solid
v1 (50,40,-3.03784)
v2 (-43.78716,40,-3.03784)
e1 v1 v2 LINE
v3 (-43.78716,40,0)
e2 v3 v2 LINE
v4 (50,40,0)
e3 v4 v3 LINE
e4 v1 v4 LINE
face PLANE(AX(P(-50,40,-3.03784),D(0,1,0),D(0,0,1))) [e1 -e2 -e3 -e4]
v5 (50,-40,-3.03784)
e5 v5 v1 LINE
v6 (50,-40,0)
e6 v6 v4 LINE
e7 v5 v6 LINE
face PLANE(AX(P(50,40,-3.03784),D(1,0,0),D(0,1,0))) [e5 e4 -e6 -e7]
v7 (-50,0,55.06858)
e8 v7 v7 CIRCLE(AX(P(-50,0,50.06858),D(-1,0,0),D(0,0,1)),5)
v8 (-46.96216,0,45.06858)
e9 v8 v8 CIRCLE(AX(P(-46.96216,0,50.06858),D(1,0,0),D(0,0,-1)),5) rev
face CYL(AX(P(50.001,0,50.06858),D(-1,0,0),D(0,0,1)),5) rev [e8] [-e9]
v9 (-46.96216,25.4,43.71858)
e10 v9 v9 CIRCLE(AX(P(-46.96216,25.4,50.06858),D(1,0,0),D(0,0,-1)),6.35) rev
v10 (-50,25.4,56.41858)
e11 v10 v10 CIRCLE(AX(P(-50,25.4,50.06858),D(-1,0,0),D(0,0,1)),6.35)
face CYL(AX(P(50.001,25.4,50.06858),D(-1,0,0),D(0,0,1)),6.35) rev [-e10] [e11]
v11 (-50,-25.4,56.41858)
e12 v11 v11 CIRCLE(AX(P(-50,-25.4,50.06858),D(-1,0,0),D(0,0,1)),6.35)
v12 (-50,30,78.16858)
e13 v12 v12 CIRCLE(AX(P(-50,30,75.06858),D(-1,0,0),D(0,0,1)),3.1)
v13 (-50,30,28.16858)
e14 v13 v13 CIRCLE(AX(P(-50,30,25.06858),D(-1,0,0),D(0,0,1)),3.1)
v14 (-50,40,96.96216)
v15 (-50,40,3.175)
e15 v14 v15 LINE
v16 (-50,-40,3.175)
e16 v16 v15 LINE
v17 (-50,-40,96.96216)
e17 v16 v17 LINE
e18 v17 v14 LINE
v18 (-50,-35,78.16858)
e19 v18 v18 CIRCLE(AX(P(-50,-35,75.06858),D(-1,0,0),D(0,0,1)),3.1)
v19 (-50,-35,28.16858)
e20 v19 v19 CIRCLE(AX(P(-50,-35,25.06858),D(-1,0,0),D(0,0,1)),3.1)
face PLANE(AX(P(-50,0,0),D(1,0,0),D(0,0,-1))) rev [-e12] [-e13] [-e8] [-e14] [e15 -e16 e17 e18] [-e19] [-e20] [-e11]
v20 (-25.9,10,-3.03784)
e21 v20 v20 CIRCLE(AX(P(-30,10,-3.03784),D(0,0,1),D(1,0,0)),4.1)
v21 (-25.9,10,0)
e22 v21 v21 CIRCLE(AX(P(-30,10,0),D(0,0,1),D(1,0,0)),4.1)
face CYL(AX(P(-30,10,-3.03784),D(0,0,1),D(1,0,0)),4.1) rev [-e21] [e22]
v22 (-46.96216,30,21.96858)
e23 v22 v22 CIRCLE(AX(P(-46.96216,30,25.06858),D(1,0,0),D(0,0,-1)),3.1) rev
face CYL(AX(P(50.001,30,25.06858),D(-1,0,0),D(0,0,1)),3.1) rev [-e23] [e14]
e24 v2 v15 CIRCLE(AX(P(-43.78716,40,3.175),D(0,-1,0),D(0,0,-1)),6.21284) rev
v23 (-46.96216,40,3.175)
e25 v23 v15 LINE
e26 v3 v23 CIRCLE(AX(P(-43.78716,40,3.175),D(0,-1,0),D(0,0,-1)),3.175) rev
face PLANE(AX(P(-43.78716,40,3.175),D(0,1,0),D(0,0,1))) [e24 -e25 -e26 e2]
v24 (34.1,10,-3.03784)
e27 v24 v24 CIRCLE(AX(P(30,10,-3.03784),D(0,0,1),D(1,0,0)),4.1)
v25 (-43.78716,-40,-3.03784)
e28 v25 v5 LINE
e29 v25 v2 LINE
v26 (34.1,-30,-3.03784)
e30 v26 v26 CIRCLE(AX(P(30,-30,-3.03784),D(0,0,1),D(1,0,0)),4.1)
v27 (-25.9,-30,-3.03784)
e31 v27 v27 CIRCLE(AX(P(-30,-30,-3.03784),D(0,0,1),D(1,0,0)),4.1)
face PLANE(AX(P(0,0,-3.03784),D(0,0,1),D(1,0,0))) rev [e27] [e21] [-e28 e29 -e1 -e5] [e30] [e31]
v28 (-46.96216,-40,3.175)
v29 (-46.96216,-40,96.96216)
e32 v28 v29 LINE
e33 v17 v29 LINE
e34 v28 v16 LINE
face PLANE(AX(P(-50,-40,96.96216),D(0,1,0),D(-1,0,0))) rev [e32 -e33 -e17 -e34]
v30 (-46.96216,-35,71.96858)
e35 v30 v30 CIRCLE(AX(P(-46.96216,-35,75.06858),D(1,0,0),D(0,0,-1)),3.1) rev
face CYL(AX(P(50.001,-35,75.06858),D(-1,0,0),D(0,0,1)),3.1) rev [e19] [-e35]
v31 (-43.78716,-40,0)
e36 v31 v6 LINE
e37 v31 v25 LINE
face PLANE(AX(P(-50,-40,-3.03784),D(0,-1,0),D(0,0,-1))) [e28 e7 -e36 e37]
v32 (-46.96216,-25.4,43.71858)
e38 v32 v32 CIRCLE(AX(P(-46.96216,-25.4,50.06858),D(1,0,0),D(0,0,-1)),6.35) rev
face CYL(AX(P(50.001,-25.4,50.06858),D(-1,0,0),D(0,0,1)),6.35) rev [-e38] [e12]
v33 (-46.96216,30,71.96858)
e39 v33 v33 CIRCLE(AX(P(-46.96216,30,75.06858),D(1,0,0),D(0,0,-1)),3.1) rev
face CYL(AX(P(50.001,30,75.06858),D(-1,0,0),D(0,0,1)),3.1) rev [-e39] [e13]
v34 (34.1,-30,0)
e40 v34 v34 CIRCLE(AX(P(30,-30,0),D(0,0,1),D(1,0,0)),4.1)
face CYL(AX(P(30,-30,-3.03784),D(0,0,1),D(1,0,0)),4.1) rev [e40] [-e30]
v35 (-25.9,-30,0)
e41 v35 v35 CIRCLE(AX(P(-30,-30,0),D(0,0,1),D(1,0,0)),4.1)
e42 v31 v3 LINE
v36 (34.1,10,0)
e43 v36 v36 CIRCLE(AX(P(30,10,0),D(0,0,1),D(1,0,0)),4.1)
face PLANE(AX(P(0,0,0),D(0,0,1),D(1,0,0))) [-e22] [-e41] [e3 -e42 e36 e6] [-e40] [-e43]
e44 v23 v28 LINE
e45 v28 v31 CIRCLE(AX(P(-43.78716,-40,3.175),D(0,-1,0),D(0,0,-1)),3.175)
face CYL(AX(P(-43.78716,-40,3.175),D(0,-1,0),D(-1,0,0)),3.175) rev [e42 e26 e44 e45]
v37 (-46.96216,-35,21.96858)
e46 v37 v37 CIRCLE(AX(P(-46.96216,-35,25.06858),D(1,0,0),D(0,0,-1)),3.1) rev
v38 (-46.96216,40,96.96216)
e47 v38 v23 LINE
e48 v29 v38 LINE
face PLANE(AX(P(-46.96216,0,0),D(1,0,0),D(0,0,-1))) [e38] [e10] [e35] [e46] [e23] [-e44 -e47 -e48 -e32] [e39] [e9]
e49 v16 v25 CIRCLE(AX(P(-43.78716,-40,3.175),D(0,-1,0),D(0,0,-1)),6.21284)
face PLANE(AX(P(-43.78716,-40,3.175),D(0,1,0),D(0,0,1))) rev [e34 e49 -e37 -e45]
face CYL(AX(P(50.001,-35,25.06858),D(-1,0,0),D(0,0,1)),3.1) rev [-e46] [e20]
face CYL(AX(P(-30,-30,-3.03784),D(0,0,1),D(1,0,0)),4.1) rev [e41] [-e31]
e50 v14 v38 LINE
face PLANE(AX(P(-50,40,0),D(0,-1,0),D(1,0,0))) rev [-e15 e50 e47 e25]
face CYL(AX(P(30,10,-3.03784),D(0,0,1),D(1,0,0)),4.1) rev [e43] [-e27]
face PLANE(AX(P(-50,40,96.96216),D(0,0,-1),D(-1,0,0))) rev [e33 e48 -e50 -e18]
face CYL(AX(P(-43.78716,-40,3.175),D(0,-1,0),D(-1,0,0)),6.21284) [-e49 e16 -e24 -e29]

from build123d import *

# Parameters (mm, degrees)
CROQUIS1_W                       = 100
CROQUIS1_H                       = 80
CROQUIS1_R                       = 4.1
BRIDA_BASE1_DEPTH                = 3.03784
BRIDA_DE_ARISTA1_STRIP_W         = 18.50136
BRIDA_DE_ARISTA1_STRIP_H         = 3.03784
BRIDA_DE_ARISTA1_STRIP_CUT_DEPTH = 80
BRIDA_DE_ARISTA1_DEPTH           = 80
CORTAR_EXTRUIR1_REACH            = 146.919
CROQUIS9_R                       = 6.35
CROQUIS9_R_2                     = 3.1
CROQUIS9_R_3                     = 5


# Sheet-metal steps are written as plain solids
with BuildPart() as part:
    # Croquis1 → Brida base1 (new body)
    with BuildSketch(Plane.XY):
        Rectangle(CROQUIS1_W, CROQUIS1_H)
        with Locations((-30, 10)):
            Circle(CROQUIS1_R, mode=Mode.SUBTRACT)
        with Locations((30, 10)):
            Circle(CROQUIS1_R, mode=Mode.SUBTRACT)
        with Locations((-30, -30)):
            Circle(CROQUIS1_R, mode=Mode.SUBTRACT)
        with Locations((30, -30)):
            Circle(CROQUIS1_R, mode=Mode.SUBTRACT)
    extrude(amount=-BRIDA_BASE1_DEPTH)

    # Brida de arista1 strip (across the edge) → Brida de arista1 strip cut (cut)
    with BuildSketch(Plane(origin=(-50, 40, 0), x_dir=(1, 0, 0), z_dir=(0, -1, 0))):
        with Locations((-3.03784, -1.51892)):
            Rectangle(BRIDA_DE_ARISTA1_STRIP_W, BRIDA_DE_ARISTA1_STRIP_H)
    extrude(amount=BRIDA_DE_ARISTA1_STRIP_CUT_DEPTH, mode=Mode.SUBTRACT)

    # Brida de arista1 section (across the edge) → Brida de arista1 (add)
    with BuildSketch(Plane(origin=(-50, 40, 0), x_dir=(1, 0, 0), z_dir=(0, -1, 0))):
        with BuildLine():
            Line((0, 3.175), (0, 96.96216))
            Line((0, 96.96216), (3.03784, 96.96216))
            Line((3.03784, 96.96216), (3.03784, 3.175))
            ThreePointArc((3.03784, 3.175), (3.96777597, 0.92993597), (6.21284, 0))
            Line((6.21284, 0), (6.21284, -3.03784))
            ThreePointArc((6.21284, -3.03784), (1.819698706, -1.218141294), (0, 3.175))
        make_face()
    extrude(amount=BRIDA_DE_ARISTA1_DEPTH)

    # Croquis9 → Cortar-Extruir1 (cut, up to next)
    with BuildSketch(Plane.ZY.offset(50), mode=Mode.PRIVATE) as cortar_extruir1_sk1:
        with Locations((50.06858, 25.4)):
            Circle(CROQUIS9_R)
    cortar_extruir1_tool1 = extrude(cortar_extruir1_sk1.sketch, amount=-CORTAR_EXTRUIR1_REACH, mode=Mode.PRIVATE) & part.part
    # Croquis9 → Cortar-Extruir1 (cut, up to next)
    with BuildSketch(Plane.ZY.offset(50), mode=Mode.PRIVATE) as cortar_extruir1_sk2:
        with Locations((50.06858, -25.4)):
            Circle(CROQUIS9_R)
    cortar_extruir1_tool2 = extrude(cortar_extruir1_sk2.sketch, amount=-CORTAR_EXTRUIR1_REACH, mode=Mode.PRIVATE) & part.part
    # Croquis9 → Cortar-Extruir1 (cut, up to next)
    with BuildSketch(Plane.ZY.offset(50), mode=Mode.PRIVATE) as cortar_extruir1_sk3:
        with Locations((25.06858, 30)):
            Circle(CROQUIS9_R_2)
    cortar_extruir1_tool3 = extrude(cortar_extruir1_sk3.sketch, amount=-CORTAR_EXTRUIR1_REACH, mode=Mode.PRIVATE) & part.part
    # Croquis9 → Cortar-Extruir1 (cut, up to next)
    with BuildSketch(Plane.ZY.offset(50), mode=Mode.PRIVATE) as cortar_extruir1_sk4:
        with Locations((75.06858, 30)):
            Circle(CROQUIS9_R_2)
    cortar_extruir1_tool4 = extrude(cortar_extruir1_sk4.sketch, amount=-CORTAR_EXTRUIR1_REACH, mode=Mode.PRIVATE) & part.part
    # Croquis9 → Cortar-Extruir1 (cut, up to next)
    with BuildSketch(Plane.ZY.offset(50), mode=Mode.PRIVATE) as cortar_extruir1_sk5:
        with Locations((25.06858, -35)):
            Circle(CROQUIS9_R_2)
    cortar_extruir1_tool5 = extrude(cortar_extruir1_sk5.sketch, amount=-CORTAR_EXTRUIR1_REACH, mode=Mode.PRIVATE) & part.part
    # Croquis9 → Cortar-Extruir1 (cut, up to next)
    with BuildSketch(Plane.ZY.offset(50), mode=Mode.PRIVATE) as cortar_extruir1_sk6:
        with Locations((75.06858, -35)):
            Circle(CROQUIS9_R_2)
    cortar_extruir1_tool6 = extrude(cortar_extruir1_sk6.sketch, amount=-CORTAR_EXTRUIR1_REACH, mode=Mode.PRIVATE) & part.part
    # Croquis9 → Cortar-Extruir1 (cut, up to next)
    with BuildSketch(Plane.ZY.offset(50), mode=Mode.PRIVATE) as cortar_extruir1_sk7:
        with Locations((50.06858, 0)):
            Circle(CROQUIS9_R_3)
    cortar_extruir1_tool7 = extrude(cortar_extruir1_sk7.sketch, amount=-CORTAR_EXTRUIR1_REACH, mode=Mode.PRIVATE) & part.part
    add(cortar_extruir1_tool1.solids().sort_by_distance((-50, 25.4, 50.06858))[0], mode=Mode.SUBTRACT)
    add(cortar_extruir1_tool2.solids().sort_by_distance((-50, -25.4, 50.06858))[0], mode=Mode.SUBTRACT)
    add(cortar_extruir1_tool3.solids().sort_by_distance((-50, 30, 25.06858))[0], mode=Mode.SUBTRACT)
    add(cortar_extruir1_tool4.solids().sort_by_distance((-50, 30, 75.06858))[0], mode=Mode.SUBTRACT)
    add(cortar_extruir1_tool5.solids().sort_by_distance((-50, -35, 25.06858))[0], mode=Mode.SUBTRACT)
    add(cortar_extruir1_tool6.solids().sort_by_distance((-50, -35, 75.06858))[0], mode=Mode.SUBTRACT)
    add(cortar_extruir1_tool7.solids().sort_by_distance((-50, 0, 50.06858))[0], mode=Mode.SUBTRACT)


solid = part.part
